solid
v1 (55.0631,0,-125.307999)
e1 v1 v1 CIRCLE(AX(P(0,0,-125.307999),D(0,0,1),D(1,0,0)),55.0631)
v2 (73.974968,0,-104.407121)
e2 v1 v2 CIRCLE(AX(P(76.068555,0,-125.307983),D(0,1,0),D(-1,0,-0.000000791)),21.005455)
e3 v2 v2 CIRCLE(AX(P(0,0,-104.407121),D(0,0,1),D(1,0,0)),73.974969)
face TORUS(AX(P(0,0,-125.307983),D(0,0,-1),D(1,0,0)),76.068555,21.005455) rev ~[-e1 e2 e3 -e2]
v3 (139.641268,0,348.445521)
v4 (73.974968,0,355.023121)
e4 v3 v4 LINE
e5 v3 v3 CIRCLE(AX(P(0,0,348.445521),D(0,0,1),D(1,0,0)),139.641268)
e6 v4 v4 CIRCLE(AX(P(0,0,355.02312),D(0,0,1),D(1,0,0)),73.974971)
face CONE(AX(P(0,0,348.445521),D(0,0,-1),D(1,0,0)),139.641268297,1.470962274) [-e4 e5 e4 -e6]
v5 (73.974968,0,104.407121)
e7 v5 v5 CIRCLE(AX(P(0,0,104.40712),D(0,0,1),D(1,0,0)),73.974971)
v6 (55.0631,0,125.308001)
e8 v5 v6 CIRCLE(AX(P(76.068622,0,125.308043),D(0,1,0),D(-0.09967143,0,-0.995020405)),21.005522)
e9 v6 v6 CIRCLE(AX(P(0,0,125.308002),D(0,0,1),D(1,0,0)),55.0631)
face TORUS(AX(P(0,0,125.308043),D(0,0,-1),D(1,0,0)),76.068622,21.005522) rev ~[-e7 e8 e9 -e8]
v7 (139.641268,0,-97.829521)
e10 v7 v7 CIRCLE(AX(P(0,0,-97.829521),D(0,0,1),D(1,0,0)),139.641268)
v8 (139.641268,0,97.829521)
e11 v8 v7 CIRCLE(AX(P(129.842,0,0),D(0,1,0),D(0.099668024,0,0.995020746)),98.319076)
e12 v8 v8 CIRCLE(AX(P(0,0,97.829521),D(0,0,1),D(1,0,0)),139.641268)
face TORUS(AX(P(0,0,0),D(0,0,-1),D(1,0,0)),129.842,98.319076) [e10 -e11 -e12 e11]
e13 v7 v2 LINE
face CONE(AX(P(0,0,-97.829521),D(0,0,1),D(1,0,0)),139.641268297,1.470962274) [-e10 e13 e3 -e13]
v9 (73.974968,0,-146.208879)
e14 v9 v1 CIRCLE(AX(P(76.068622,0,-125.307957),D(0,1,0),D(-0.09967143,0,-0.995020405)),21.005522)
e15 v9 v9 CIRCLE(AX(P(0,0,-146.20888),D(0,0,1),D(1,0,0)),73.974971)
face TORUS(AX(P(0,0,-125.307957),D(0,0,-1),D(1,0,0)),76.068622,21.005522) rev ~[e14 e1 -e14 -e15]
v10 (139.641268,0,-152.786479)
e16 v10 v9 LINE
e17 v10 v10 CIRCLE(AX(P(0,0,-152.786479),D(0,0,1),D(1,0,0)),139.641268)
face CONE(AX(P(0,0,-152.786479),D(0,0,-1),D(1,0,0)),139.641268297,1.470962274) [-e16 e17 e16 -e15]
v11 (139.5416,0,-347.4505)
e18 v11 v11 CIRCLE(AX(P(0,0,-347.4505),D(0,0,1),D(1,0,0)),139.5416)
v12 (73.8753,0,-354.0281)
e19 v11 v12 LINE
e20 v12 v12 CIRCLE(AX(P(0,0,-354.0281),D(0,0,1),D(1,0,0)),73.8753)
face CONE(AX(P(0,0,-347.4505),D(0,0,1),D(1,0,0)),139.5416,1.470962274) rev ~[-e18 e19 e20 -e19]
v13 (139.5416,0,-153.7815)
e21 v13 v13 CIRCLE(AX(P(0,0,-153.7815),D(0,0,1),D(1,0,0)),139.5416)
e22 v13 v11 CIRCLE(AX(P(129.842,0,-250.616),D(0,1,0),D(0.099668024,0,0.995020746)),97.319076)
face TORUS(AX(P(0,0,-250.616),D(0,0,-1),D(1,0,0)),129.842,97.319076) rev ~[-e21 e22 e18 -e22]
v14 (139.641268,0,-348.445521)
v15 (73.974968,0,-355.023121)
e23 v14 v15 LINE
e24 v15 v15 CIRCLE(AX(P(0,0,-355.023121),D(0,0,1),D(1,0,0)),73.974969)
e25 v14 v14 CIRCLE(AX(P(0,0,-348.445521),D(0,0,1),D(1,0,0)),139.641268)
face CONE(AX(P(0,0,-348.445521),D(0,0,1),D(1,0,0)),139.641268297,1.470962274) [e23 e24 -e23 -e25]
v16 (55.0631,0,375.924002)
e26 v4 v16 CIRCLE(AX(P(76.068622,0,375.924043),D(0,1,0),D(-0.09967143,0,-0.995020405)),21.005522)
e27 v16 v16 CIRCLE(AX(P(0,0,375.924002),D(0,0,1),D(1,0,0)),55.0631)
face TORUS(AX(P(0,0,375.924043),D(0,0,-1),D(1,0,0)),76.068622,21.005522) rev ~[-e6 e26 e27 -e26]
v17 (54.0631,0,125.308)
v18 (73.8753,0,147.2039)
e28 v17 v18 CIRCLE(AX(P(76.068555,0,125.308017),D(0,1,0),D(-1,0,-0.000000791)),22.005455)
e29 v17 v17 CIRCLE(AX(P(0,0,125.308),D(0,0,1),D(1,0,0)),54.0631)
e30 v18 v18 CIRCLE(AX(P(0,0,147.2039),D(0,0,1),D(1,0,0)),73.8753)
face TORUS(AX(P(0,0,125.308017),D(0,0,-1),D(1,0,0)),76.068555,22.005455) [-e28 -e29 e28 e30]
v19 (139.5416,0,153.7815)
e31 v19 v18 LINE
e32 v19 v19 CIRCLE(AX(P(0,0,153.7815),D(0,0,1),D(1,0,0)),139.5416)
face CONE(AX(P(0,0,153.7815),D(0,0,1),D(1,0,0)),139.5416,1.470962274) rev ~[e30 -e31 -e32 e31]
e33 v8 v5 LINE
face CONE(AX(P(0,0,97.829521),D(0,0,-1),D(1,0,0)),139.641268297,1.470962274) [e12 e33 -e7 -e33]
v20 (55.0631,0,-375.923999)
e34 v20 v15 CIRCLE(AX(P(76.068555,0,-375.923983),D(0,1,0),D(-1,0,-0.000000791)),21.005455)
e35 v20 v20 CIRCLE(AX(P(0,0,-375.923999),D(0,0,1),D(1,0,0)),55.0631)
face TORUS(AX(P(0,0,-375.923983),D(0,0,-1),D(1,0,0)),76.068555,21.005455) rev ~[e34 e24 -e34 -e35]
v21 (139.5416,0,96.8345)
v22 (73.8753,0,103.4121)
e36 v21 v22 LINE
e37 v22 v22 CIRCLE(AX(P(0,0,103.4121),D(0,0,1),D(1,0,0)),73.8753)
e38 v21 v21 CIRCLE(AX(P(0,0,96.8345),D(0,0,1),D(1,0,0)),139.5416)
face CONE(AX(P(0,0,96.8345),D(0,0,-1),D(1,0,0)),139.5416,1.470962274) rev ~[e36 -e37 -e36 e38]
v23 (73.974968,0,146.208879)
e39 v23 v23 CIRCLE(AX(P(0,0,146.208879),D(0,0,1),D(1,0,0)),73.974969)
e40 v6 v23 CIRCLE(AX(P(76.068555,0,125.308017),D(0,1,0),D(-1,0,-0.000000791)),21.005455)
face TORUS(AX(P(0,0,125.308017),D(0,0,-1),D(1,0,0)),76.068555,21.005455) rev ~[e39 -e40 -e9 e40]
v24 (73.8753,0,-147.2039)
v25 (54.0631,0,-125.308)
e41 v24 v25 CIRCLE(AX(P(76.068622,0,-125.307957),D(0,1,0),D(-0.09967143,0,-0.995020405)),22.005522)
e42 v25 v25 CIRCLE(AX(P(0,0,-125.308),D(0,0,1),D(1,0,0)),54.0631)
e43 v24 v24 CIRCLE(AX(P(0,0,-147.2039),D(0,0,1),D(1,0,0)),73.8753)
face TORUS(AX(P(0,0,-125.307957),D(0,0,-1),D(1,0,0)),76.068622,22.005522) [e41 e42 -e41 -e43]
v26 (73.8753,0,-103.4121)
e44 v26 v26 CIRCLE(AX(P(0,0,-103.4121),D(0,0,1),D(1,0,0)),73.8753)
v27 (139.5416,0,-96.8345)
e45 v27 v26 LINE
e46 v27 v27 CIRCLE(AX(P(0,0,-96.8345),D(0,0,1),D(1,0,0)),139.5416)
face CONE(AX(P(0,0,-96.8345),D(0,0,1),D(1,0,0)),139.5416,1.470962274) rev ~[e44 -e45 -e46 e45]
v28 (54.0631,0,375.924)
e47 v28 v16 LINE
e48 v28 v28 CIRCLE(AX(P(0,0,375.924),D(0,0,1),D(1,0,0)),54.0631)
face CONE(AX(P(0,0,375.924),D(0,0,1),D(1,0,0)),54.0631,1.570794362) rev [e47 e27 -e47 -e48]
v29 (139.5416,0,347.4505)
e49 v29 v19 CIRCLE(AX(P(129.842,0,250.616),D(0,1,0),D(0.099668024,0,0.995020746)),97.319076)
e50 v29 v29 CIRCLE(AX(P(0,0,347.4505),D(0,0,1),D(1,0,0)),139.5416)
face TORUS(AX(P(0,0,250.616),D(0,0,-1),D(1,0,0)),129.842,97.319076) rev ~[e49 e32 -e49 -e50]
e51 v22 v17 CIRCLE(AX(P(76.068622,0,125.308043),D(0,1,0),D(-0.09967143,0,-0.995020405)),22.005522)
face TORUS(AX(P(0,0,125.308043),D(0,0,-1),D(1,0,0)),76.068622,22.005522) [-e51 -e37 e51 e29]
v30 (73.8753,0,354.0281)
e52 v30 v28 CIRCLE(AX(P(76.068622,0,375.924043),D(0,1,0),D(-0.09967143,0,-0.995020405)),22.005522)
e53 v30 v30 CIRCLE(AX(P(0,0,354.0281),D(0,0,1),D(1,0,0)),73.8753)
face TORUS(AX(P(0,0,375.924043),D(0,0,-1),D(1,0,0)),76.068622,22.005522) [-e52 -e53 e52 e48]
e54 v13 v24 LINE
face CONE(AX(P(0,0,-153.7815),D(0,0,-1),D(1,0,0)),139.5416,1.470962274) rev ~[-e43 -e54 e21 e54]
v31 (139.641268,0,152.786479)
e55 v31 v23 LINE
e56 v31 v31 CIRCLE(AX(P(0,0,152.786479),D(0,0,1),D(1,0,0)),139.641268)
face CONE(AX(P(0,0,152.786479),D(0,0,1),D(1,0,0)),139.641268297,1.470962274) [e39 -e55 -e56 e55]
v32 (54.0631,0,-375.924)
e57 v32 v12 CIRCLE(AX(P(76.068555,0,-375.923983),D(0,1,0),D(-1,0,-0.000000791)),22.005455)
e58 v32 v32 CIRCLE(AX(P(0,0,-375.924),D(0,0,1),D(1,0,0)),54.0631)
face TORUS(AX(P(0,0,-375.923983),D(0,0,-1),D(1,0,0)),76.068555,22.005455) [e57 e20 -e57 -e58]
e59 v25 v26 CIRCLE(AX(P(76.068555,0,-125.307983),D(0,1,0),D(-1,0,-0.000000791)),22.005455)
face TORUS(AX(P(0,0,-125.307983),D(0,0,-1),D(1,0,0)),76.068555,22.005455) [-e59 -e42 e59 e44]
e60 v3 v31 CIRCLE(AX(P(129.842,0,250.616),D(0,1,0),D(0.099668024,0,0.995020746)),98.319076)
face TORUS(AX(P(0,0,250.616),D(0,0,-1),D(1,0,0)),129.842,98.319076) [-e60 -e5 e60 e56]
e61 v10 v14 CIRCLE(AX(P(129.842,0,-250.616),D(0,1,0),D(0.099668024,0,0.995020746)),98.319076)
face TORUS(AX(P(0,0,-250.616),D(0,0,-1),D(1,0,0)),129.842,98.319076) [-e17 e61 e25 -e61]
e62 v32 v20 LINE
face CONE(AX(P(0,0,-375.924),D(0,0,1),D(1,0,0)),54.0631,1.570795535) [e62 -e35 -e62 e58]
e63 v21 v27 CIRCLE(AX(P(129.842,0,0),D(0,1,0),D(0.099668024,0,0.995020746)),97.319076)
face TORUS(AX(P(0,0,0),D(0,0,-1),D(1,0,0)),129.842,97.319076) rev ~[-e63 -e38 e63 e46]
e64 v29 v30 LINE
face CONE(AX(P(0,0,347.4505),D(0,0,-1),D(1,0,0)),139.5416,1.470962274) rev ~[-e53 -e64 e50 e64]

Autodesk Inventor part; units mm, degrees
ref_plane "YZ Plane" through (0, 0, 0) normal (1, 0, 0) x (0, 1, 0)
ref_plane "XZ Plane" through (0, 0, 0) normal (0, 1, 0) x (-1, 0, 0)
ref_plane "XY Plane" through (0, 0, 0) normal (0, 0, 1) x (1, 0, 0)
sketch "Sketch1" plane through (0, 0, 0) normal (0, 1, 0) x (-1, 0, 0)
  arc A0 (-139.5416, 96.8345) -> (-139.5416, -96.8345) centre (-129.842, 0) ccw
  arc A1 (-54.0631, -125.308) -> (-73.8753, -103.4121) centre (-76.0686, -125.308) ccw
  line L0 (-139.5416, -96.8345) -> (-73.8753, -103.4121)
  line L1 (-139.5416, 96.8345) -> (-73.8753, 103.4121)
  arc A2 (-73.8753, 103.4121) -> (-54.0631, 125.308) centre (-76.0686, 125.308) ccw
  line L2 (-54.0631, -125.308) -> (-54.0631, -154.6881) construction
  line L3 (-54.0631, 125.308) -> (-54.0631, 163.9201) construction
  line L4 (0, -218.4097) -> (0, 227.6417) projected
  point P0 (0, 0)
  point P1 (-227.161, 0)
  dimension "d0" = 22.0055
  dimension "d2" = 250.616
  dimension "d3" = 227.161
surface revolve "RevolutionSrf1" sketch "Sketch1" angle 360 about axis through (0, 0, -10) along (0, 0, 1) shown no curves A1 L0 A0 L1 A2
thicken "Thicken1" operation new thickness 1 both sides no extend neighbours no toward (-0.5666588, -0.8236218, -0.0233465) faces at (-128.7428, -187.1239, -2.2721) (-114.3989, 50.251, -98.2961) (21.8674, -66.8564, -104.0607) (-114.3989, 50.251, 98.2961) (21.8674, -66.8564, 104.0607)
pattern_linear "Rectangular Pattern1" count 3 spacing 250.616 along (0, 0, 1) first direction both ways yes
properties part number "Lcavity500"
